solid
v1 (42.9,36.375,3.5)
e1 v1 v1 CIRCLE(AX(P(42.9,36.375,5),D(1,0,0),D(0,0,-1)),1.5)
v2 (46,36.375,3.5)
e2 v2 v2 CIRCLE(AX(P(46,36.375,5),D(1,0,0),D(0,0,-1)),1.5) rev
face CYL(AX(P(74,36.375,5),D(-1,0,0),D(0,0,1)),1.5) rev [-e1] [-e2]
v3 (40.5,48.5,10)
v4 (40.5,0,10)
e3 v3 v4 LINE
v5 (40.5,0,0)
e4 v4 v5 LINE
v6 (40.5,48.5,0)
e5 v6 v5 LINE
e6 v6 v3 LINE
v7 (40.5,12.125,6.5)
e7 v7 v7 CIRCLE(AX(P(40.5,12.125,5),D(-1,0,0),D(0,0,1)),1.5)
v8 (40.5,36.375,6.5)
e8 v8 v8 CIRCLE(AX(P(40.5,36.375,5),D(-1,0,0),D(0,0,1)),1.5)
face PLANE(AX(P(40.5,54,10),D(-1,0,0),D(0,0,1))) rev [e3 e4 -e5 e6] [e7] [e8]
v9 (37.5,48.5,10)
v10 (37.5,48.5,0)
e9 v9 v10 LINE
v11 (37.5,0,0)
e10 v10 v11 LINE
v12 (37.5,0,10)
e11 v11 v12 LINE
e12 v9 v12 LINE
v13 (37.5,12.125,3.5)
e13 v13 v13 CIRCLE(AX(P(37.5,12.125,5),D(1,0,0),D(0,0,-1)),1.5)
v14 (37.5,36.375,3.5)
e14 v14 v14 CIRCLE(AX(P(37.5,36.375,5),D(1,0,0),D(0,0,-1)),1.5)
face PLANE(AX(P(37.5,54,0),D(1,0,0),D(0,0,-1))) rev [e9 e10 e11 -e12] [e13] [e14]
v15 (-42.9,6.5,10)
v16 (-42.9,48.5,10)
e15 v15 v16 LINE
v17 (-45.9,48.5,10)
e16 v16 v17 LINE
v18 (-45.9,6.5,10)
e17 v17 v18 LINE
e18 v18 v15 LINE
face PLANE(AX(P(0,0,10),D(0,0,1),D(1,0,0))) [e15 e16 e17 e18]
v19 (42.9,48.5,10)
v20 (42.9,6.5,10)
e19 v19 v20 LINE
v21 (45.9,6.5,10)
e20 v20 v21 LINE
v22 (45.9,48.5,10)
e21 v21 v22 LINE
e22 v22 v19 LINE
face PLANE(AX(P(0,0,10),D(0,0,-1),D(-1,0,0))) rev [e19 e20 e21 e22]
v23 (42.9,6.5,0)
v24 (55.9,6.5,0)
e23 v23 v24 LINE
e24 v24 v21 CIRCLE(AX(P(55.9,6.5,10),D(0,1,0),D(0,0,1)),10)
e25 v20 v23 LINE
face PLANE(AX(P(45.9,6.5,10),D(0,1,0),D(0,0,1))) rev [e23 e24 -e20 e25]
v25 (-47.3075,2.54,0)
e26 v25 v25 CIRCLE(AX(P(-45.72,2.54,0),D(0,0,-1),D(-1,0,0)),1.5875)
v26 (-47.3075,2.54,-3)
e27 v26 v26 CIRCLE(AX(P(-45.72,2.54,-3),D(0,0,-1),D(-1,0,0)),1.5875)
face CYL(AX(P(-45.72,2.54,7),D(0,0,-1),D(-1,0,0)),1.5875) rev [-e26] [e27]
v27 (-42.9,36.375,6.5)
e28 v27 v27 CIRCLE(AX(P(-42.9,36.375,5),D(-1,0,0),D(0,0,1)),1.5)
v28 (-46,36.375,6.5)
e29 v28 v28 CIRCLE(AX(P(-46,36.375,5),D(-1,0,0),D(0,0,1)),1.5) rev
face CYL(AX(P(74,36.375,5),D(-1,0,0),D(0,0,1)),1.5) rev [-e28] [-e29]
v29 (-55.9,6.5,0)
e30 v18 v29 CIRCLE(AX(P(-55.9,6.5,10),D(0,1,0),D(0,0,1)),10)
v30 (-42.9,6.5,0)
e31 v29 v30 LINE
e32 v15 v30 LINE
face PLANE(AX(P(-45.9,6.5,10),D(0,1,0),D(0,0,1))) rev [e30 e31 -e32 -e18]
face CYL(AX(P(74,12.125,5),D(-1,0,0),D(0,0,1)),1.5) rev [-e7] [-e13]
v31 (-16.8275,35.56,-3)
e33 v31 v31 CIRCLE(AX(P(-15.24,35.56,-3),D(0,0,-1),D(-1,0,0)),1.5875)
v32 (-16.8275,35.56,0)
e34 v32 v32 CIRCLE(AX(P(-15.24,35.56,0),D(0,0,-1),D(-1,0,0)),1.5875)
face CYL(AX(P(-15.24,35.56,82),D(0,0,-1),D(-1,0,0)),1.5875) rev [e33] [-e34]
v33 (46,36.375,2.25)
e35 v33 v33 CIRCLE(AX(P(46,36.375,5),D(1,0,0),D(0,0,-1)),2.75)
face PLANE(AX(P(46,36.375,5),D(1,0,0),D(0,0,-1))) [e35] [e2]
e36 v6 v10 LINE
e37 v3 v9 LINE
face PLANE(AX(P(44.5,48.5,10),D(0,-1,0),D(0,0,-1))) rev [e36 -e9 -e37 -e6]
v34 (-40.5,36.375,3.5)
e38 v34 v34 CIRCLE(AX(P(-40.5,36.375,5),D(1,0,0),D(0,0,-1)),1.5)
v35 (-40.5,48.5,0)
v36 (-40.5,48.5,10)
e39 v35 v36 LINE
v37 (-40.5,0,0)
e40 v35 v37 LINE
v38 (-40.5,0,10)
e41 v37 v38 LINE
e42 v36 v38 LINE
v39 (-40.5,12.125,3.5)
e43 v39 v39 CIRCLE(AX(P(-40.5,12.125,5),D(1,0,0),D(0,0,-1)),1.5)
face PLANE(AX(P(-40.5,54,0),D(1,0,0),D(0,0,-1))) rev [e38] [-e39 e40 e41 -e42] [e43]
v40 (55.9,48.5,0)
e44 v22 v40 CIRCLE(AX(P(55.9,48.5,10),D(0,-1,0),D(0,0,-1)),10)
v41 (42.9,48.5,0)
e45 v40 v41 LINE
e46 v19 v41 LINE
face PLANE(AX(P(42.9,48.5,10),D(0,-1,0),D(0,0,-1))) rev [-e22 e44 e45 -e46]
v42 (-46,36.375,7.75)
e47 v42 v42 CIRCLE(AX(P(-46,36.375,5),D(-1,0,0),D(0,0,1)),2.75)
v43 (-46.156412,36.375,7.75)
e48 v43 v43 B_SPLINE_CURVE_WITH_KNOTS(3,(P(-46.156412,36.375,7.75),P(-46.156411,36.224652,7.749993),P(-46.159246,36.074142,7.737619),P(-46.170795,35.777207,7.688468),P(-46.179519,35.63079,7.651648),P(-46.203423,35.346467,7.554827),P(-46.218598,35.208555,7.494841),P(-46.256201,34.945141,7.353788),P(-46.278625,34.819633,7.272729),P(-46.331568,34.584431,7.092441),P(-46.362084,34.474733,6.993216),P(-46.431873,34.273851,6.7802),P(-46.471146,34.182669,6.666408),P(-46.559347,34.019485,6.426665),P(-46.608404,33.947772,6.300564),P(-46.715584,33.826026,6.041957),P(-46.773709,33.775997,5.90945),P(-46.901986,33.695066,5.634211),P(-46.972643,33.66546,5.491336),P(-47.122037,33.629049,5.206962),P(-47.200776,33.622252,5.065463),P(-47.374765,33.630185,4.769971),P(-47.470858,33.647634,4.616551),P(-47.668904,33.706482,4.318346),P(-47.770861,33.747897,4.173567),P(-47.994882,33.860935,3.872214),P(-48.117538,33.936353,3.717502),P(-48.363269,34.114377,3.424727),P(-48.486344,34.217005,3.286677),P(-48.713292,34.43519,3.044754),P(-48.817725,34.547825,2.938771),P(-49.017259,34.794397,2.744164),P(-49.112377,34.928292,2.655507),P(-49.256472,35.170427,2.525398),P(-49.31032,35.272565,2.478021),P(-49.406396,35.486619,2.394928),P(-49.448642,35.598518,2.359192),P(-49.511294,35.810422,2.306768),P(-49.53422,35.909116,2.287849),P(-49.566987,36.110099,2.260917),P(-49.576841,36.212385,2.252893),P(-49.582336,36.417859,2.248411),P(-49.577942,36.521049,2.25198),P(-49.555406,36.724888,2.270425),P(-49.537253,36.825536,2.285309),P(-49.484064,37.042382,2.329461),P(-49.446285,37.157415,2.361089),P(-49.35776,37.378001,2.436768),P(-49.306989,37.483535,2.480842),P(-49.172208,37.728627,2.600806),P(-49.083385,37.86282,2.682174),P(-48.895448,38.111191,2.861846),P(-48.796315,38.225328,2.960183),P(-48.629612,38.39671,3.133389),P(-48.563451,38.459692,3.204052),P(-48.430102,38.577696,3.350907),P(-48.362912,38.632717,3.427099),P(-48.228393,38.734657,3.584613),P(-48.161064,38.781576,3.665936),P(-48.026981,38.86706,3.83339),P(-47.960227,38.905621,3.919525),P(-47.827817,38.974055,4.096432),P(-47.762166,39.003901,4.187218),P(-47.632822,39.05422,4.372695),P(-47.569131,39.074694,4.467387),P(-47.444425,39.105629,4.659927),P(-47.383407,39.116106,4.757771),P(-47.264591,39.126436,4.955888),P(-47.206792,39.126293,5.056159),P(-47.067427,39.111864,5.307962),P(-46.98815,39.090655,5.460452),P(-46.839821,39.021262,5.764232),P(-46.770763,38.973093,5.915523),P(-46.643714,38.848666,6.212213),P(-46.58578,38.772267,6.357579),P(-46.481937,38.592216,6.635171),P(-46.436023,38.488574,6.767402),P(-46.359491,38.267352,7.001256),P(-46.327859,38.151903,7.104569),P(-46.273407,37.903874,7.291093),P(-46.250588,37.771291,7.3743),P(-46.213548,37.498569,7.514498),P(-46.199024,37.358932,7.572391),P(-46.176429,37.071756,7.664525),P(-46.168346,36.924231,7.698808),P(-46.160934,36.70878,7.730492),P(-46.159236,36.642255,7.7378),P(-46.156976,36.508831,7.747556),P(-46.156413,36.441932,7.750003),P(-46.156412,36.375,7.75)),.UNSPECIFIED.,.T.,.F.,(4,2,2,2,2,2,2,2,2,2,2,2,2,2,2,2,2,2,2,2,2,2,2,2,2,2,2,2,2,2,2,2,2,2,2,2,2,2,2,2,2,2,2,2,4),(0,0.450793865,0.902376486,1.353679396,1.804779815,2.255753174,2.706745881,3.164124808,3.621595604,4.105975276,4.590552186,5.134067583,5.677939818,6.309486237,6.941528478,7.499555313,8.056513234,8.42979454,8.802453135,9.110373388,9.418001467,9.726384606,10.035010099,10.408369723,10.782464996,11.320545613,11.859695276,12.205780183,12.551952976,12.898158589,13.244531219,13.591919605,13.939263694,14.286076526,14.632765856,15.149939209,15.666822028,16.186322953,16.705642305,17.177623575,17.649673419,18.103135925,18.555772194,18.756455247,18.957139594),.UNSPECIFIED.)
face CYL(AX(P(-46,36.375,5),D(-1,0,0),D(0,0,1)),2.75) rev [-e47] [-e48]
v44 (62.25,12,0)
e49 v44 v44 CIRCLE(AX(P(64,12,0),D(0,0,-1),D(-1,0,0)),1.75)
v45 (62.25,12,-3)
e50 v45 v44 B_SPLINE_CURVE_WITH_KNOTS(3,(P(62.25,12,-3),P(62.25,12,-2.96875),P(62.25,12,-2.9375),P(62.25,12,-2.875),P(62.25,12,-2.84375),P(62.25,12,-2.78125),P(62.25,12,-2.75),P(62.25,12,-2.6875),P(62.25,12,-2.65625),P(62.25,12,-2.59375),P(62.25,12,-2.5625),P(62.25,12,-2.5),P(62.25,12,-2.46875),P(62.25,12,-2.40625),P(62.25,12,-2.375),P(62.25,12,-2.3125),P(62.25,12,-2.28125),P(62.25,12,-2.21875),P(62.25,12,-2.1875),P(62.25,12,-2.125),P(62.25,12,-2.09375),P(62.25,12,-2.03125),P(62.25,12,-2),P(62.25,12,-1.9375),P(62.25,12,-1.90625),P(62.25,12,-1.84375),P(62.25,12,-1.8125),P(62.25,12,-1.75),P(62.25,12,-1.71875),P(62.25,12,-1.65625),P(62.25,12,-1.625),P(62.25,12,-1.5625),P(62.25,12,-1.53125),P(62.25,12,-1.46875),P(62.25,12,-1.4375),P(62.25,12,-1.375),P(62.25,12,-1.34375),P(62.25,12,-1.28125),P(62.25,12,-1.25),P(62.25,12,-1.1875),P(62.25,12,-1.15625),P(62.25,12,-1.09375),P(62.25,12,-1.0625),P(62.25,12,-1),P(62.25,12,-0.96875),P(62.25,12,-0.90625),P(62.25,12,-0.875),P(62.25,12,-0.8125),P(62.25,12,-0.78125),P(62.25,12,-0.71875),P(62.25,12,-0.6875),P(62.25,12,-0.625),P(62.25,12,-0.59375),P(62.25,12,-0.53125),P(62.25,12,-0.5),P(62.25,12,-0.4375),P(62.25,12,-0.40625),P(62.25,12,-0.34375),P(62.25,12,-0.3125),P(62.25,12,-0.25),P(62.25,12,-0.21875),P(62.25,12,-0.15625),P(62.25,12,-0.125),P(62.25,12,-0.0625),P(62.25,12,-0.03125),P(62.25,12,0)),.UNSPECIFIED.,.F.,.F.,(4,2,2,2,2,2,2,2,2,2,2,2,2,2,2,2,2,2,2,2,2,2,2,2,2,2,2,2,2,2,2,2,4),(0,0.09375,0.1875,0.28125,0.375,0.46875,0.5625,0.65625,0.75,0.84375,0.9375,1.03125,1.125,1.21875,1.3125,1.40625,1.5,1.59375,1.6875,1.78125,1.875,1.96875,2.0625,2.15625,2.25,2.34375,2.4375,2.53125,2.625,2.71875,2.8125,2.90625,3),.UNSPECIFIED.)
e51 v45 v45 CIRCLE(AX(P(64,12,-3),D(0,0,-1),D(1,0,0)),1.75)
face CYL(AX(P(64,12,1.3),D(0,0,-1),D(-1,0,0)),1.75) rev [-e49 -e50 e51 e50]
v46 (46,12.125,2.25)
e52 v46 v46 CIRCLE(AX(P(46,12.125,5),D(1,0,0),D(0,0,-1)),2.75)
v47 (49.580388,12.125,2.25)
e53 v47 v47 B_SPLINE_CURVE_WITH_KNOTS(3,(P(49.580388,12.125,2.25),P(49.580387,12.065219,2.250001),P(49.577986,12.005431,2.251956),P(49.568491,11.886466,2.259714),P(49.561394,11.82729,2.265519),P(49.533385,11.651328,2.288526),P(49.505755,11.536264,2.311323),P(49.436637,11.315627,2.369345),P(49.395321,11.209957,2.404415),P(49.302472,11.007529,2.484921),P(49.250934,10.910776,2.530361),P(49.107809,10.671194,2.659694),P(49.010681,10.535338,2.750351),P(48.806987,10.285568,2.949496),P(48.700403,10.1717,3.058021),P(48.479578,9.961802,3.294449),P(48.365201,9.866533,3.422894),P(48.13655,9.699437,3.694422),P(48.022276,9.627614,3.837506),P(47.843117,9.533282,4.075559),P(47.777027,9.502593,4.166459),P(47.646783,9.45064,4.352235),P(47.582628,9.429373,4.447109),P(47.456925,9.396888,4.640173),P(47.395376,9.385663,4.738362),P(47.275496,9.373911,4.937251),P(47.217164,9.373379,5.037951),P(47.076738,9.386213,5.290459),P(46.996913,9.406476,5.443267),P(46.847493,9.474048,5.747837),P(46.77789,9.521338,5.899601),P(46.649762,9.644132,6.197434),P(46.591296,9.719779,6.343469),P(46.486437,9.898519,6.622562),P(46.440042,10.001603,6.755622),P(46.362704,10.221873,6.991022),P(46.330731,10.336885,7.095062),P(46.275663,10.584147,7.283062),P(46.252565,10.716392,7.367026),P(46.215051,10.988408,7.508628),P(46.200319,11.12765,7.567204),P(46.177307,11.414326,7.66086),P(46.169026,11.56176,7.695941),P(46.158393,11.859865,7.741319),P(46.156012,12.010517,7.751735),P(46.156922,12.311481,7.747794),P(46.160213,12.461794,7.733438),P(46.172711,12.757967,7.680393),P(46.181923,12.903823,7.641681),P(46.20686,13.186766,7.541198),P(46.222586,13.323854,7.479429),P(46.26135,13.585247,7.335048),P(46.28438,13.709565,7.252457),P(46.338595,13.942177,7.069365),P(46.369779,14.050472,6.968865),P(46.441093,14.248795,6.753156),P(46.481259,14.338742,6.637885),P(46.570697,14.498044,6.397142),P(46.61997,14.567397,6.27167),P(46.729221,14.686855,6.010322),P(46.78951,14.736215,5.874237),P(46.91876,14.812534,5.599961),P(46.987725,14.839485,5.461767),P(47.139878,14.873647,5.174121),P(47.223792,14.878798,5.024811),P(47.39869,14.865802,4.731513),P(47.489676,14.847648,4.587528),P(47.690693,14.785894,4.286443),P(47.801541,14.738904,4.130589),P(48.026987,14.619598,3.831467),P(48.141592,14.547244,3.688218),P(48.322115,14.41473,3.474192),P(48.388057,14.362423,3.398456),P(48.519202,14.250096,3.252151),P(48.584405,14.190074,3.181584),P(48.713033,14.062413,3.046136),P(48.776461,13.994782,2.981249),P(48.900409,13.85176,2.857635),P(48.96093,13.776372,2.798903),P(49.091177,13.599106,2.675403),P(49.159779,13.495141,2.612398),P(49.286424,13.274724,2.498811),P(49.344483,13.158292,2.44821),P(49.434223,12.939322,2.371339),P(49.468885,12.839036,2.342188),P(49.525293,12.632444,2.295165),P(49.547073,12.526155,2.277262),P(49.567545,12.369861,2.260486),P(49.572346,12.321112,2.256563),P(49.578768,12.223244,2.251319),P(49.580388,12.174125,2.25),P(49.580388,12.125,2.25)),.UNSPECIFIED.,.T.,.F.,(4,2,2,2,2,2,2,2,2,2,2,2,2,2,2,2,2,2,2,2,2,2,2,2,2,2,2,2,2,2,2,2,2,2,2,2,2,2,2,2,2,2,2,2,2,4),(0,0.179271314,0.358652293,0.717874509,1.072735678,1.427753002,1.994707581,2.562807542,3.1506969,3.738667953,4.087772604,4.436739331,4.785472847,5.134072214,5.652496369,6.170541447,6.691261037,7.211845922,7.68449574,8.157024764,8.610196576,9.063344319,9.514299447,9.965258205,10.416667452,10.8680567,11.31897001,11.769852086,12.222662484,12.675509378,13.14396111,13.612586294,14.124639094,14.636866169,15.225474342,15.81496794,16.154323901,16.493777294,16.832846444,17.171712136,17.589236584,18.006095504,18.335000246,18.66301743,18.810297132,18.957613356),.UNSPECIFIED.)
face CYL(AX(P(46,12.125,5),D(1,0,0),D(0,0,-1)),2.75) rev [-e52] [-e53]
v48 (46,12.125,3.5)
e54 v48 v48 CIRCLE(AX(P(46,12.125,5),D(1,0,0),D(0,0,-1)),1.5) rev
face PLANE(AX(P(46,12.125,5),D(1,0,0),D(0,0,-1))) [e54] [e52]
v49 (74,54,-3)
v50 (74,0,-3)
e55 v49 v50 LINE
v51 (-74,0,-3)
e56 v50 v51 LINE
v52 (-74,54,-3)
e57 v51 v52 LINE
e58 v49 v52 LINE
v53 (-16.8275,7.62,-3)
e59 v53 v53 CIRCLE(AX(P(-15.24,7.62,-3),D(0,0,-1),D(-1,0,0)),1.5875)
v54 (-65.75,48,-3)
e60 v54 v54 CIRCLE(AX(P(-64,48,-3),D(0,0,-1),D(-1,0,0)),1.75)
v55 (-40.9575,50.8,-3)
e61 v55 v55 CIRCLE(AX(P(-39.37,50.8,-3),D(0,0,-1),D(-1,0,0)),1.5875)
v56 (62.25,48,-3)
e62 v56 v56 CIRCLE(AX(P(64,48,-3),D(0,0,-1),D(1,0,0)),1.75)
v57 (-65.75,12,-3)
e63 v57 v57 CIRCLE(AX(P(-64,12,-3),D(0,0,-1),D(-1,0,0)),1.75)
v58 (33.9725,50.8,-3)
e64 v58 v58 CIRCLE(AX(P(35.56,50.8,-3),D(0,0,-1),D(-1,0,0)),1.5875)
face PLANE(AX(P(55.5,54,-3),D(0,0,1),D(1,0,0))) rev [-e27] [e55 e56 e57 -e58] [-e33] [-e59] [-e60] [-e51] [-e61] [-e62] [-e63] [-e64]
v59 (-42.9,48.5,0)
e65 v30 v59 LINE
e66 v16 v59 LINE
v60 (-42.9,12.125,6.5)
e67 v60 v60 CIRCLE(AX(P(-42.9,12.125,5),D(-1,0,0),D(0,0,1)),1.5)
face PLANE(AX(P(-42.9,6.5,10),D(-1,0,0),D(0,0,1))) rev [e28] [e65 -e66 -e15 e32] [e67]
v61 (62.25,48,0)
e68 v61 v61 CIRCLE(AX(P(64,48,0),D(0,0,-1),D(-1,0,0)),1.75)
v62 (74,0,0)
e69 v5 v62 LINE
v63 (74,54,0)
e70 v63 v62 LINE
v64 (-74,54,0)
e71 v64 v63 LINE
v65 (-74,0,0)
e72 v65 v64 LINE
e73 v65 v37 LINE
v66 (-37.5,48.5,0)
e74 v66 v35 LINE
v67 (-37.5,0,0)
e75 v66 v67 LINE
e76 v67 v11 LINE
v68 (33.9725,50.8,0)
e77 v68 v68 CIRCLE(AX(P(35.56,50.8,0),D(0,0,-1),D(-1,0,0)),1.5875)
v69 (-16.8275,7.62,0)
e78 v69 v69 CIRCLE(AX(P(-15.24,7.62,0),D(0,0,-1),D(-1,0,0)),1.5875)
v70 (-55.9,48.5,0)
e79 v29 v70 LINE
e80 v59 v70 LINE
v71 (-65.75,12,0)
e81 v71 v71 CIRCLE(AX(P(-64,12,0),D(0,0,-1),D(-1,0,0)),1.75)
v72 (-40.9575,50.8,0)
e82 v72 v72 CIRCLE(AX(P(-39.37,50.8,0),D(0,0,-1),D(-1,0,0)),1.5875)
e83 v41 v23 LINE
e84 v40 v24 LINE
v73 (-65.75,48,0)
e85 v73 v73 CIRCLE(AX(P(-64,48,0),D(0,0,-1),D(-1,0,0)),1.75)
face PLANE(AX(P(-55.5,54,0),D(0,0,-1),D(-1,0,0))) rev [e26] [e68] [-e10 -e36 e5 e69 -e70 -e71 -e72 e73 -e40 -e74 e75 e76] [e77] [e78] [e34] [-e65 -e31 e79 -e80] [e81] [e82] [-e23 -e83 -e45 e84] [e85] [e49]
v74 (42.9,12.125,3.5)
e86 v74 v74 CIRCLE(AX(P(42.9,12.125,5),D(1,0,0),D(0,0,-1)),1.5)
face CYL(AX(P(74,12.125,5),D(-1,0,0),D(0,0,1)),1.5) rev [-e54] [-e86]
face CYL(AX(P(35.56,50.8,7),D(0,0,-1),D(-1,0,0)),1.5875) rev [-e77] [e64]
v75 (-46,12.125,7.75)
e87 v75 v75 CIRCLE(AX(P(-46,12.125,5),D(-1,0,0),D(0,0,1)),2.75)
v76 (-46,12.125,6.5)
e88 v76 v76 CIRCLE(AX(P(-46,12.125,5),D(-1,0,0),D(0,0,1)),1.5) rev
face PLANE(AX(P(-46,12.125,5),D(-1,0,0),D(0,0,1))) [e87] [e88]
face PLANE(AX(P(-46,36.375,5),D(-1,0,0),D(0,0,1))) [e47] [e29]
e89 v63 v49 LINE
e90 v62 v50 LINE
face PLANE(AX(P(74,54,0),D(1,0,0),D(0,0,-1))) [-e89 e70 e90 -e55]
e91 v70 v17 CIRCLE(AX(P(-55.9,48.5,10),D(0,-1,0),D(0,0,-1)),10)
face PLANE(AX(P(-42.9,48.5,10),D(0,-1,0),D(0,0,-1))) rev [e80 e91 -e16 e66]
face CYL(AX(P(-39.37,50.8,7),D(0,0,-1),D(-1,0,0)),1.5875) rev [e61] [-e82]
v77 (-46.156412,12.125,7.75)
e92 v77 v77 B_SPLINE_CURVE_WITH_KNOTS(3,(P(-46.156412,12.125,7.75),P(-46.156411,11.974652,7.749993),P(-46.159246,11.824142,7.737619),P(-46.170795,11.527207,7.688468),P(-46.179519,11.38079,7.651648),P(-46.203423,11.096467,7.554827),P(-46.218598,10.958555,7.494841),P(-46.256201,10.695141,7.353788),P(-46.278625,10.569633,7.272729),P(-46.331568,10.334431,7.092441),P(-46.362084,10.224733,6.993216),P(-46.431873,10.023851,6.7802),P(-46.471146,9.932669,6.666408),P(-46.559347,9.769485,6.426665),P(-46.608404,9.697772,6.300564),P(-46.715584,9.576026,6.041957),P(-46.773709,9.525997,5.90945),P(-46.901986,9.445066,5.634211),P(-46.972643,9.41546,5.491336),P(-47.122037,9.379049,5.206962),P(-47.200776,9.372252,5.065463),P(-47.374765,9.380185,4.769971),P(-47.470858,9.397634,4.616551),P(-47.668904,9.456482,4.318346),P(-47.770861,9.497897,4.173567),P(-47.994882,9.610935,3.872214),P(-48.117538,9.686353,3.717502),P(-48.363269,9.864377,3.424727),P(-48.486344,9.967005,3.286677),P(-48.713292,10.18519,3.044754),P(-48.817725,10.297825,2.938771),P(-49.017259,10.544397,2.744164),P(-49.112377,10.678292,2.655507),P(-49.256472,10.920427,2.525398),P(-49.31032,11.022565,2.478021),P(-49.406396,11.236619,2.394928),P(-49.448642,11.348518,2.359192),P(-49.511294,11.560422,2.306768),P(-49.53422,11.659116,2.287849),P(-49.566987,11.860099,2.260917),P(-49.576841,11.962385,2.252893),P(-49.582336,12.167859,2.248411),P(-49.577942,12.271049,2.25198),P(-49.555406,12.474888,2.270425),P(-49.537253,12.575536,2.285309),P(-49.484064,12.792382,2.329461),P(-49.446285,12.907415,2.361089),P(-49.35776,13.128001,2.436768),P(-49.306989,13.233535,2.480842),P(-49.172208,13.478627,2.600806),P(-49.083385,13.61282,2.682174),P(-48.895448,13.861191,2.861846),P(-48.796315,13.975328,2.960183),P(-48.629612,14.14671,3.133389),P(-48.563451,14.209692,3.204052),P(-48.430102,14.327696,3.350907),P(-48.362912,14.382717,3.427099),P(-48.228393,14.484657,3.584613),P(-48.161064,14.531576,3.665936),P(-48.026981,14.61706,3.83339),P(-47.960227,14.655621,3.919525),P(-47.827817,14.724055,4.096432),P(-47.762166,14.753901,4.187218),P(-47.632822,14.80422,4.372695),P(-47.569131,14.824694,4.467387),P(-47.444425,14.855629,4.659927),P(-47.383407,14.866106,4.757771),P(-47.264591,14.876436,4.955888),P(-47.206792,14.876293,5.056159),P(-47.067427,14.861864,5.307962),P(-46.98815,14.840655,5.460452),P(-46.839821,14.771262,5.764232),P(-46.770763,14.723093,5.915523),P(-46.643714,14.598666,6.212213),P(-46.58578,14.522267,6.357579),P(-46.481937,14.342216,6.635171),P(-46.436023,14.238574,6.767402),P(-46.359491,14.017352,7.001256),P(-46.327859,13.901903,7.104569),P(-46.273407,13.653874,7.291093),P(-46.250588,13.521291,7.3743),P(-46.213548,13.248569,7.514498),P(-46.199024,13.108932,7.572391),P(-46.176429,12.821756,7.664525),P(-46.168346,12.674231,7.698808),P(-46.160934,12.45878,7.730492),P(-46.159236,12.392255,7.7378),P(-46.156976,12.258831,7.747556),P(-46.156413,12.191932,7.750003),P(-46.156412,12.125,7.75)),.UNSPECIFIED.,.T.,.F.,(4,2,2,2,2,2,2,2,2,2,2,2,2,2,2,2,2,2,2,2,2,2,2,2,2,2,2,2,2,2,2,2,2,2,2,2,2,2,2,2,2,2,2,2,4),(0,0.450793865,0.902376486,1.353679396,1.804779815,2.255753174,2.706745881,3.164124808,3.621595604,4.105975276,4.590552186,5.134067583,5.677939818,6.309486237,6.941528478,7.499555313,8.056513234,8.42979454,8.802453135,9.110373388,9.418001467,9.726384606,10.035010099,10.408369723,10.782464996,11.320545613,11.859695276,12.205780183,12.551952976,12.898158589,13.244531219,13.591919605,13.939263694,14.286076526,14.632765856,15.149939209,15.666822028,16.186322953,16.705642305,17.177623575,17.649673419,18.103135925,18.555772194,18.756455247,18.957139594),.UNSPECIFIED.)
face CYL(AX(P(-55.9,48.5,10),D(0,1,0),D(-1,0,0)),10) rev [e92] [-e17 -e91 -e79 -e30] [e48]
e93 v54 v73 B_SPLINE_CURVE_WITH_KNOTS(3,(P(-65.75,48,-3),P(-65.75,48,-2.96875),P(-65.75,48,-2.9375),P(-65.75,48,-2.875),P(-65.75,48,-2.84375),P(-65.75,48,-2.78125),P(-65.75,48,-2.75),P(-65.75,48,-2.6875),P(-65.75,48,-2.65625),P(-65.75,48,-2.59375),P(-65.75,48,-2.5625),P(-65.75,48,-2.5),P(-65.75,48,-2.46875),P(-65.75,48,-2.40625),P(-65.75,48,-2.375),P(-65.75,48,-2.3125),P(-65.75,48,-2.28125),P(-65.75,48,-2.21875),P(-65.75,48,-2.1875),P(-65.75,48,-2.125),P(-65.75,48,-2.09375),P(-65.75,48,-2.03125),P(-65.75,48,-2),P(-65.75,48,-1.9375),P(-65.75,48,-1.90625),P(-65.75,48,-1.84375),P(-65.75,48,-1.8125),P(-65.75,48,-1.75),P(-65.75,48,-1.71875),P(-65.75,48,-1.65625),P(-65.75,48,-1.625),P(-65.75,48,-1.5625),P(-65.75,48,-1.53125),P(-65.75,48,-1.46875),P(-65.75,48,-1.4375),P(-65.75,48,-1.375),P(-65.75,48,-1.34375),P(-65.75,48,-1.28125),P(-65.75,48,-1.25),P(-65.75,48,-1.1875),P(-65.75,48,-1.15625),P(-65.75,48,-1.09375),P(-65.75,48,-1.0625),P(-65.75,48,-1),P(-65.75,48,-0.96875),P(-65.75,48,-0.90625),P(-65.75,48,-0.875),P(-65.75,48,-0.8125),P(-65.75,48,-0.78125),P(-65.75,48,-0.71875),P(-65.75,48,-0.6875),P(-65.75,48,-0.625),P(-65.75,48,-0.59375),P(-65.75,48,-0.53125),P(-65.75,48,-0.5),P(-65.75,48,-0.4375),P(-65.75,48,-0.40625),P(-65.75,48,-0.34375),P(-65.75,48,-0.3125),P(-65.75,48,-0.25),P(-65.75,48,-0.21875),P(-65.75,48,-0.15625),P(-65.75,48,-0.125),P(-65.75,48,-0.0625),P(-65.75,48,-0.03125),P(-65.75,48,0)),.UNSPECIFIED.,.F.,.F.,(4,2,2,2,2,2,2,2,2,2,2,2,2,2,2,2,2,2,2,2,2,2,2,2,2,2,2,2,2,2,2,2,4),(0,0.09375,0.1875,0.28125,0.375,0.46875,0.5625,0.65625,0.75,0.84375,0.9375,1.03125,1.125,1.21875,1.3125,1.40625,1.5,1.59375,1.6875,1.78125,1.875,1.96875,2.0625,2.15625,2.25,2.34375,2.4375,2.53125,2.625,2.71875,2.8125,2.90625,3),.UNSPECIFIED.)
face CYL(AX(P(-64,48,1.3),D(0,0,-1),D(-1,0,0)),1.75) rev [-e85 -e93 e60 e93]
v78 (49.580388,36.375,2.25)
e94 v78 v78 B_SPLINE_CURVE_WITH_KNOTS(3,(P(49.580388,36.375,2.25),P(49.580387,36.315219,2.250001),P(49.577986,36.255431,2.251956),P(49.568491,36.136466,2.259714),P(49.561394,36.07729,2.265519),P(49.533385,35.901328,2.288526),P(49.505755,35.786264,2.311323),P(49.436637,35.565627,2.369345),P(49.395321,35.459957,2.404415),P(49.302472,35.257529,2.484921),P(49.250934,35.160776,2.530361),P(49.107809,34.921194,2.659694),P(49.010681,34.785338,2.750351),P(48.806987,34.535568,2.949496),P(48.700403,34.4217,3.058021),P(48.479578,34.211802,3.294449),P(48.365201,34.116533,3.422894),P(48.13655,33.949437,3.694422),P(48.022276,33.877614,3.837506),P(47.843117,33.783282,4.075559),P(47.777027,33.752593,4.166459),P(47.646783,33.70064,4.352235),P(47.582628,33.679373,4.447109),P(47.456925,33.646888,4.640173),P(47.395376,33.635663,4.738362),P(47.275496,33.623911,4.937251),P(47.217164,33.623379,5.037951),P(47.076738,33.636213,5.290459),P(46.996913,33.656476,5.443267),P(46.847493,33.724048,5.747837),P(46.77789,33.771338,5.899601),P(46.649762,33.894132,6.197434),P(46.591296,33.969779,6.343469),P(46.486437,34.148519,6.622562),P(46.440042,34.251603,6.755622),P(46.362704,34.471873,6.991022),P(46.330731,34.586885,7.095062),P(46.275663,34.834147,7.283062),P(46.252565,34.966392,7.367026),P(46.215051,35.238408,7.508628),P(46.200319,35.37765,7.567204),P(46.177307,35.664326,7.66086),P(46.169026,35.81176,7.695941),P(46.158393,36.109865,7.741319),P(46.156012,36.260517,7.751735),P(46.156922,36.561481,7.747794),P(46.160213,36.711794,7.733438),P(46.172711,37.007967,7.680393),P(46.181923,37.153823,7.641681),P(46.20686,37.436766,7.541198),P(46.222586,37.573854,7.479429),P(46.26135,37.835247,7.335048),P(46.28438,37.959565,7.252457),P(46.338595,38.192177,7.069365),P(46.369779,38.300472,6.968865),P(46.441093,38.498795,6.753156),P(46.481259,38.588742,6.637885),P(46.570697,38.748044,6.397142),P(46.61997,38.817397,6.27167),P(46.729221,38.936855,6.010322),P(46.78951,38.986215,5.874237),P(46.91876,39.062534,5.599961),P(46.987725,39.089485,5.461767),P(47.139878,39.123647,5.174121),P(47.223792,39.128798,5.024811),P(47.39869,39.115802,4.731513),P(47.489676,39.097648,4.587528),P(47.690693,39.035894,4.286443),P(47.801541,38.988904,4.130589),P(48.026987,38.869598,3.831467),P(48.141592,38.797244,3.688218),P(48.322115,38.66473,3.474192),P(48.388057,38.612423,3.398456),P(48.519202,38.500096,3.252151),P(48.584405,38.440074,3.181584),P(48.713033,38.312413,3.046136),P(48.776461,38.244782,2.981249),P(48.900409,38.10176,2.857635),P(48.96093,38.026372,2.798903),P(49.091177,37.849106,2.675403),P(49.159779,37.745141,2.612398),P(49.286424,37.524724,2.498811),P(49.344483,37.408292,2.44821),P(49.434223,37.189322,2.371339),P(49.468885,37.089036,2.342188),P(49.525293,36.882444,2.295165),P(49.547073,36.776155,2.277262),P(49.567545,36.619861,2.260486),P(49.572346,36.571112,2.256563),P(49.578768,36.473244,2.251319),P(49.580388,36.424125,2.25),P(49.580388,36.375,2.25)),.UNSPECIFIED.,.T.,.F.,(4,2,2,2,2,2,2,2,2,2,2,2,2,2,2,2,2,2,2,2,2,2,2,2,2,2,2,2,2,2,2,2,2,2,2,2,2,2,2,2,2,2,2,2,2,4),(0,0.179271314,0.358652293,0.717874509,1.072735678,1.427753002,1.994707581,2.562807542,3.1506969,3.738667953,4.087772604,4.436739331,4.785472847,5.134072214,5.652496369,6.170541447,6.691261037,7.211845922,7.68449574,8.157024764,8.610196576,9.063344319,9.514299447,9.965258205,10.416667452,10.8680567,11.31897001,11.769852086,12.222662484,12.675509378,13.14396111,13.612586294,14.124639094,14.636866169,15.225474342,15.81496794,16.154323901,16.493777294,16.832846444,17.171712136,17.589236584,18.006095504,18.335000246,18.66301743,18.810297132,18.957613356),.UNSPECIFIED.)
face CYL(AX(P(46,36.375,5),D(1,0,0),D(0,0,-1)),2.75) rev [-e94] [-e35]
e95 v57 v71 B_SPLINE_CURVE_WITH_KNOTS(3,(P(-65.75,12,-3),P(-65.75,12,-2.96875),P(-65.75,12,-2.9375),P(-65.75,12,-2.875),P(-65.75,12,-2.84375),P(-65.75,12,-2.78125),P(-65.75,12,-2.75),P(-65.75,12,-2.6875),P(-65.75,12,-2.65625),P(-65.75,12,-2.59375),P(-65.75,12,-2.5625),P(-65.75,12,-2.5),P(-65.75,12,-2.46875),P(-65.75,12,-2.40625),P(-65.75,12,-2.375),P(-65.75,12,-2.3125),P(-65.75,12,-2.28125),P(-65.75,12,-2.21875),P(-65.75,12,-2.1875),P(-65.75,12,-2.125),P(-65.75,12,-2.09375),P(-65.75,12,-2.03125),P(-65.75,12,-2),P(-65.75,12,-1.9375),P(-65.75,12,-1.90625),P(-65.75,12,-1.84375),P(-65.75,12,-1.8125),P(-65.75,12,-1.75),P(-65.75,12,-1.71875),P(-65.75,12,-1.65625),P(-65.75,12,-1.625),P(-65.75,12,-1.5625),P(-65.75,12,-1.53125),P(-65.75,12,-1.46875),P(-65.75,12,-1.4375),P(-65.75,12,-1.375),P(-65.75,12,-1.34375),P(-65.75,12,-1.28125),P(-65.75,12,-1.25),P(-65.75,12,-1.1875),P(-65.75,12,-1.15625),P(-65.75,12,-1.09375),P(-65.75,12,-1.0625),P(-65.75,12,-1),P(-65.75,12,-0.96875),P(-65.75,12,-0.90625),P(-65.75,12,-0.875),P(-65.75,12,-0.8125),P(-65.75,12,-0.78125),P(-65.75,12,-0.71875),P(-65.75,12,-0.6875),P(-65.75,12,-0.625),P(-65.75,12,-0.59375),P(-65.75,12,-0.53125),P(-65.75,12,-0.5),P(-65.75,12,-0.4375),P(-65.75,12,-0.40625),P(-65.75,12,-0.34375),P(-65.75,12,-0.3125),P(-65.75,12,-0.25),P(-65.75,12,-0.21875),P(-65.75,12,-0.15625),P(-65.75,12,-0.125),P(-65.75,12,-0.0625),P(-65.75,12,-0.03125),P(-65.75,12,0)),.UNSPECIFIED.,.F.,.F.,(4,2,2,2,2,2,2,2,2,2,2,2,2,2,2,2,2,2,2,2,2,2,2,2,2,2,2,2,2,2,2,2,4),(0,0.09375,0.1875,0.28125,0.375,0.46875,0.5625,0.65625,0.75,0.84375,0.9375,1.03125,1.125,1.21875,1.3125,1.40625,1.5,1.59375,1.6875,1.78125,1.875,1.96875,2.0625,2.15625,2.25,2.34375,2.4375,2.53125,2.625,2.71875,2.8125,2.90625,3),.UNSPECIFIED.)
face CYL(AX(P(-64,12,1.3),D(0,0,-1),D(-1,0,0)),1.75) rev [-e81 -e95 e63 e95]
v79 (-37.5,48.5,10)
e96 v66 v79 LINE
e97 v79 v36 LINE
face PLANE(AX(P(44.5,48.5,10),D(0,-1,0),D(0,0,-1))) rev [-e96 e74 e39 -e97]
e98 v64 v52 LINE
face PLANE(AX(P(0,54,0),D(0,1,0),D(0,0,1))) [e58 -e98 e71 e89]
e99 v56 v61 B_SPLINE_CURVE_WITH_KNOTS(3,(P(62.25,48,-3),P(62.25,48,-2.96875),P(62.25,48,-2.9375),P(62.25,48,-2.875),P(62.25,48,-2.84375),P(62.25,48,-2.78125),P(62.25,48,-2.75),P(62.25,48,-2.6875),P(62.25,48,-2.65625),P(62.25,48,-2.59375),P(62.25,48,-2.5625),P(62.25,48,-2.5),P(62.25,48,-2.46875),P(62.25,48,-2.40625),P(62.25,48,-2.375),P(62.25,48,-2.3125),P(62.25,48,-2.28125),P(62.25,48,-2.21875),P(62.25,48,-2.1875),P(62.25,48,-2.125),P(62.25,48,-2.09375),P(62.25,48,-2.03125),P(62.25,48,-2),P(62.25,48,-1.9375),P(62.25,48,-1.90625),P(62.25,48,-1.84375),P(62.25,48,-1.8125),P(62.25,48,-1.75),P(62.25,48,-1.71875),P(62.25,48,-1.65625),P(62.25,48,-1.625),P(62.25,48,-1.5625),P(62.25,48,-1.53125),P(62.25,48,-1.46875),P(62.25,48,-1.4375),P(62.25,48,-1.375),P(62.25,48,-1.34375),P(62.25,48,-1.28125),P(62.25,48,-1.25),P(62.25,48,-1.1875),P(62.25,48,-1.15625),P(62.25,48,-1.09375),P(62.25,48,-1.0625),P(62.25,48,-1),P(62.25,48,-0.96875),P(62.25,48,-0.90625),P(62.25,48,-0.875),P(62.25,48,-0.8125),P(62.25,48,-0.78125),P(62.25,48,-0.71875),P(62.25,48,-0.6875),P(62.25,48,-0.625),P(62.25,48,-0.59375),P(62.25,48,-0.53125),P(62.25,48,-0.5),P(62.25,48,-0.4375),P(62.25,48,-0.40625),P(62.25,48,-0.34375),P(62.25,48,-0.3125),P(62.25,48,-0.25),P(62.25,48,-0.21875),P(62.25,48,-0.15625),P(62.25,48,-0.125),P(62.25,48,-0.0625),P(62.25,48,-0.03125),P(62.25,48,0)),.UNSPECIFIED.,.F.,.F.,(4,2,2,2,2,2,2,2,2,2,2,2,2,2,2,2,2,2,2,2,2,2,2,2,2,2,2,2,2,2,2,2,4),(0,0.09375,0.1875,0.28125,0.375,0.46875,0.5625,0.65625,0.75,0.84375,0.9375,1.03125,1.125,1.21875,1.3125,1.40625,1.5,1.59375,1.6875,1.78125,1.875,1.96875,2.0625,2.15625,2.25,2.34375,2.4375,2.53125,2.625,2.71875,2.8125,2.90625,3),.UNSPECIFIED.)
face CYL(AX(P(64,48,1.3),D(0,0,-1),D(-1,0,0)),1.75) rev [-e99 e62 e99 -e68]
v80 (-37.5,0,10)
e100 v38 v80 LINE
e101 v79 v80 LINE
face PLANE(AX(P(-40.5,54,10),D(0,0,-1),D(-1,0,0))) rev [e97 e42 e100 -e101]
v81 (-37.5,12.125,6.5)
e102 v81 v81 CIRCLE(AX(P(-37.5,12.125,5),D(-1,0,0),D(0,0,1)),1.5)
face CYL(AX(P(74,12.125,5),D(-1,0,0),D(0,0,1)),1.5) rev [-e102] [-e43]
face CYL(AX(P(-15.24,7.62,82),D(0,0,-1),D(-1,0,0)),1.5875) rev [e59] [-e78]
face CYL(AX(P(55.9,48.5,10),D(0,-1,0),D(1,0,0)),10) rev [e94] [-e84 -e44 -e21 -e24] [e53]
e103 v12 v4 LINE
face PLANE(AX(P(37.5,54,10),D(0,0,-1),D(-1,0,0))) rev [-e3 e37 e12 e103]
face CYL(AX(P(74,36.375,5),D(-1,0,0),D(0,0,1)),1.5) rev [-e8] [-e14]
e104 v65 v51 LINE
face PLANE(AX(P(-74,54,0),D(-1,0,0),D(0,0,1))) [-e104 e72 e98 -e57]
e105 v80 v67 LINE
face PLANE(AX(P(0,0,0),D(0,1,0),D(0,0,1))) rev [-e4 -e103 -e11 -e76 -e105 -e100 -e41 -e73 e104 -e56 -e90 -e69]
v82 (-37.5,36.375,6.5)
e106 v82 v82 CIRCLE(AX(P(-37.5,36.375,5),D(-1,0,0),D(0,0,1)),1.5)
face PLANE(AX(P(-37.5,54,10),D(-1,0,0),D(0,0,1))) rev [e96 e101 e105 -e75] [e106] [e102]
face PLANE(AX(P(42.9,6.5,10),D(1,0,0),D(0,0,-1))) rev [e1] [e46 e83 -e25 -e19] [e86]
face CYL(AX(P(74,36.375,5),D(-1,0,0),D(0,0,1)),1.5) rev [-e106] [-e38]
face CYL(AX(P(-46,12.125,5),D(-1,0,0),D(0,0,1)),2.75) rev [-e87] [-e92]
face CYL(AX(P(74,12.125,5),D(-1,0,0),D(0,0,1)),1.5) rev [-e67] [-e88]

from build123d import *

# Parameters (mm, degrees)
BOSS_EXTRUDE1_DEPTH     = 54
SKETCH2_W               = 10
SKETCH2_H               = 5.5
CUT_EXTRUDE1_DEPTH      = 85
SKETCH5_R               = 1.5875
CUT_EXTRUDE4_DEPTH      = 85
SKETCH3_R               = 1.5875
CUT_EXTRUDE5_DEPTH      = 10
SKETCH6_W               = 18.5
SKETCH6_H               = 54
BOSS_EXTRUDE2_DEPTH     = 3
SKETCH7_W               = 3
SKETCH7_H               = 42
BOSS_EXTRUDE3_DEPTH     = 10
CUT_EXTRUDE3_DEPTH      = 127.989172767
CUT_EXTRUDE3_DEPTH_BACK = 127.989172767
SKETCH4_R               = 1.5
FILLET1_R               = 10
SKETCH8_R               = 2.75
CUT_EXTRUDE6_DEPTH      = 28
CUT_EXTRUDE7_START      = -28
SKETCH10_R              = 2.75
CUT_EXTRUDE7_DEPTH      = 28
SKETCH11_R              = 1.75
CUT_EXTRUDE8_DEPTH      = 4.3


with BuildPart() as part:
    # Sketch1 → Boss-Extrude1 (new body)
    with BuildSketch(Plane(origin=(0, 0, 0), x_dir=(1, 0, 0), z_dir=(0, 1, 0))):
        Polygon((-37.5, -10), (-37.5, 0), (37.5, 0), (37.5, -10), (40.5, -10), (40.5, 0), (55.5, 0), (55.5, 3), (-55.5, 3), (-55.5, 0), (-40.5, 0), (-40.5, -10), align=None)
    extrude(amount=BOSS_EXTRUDE1_DEPTH)

    # Sketch2 → Cut-Extrude1 (cut)
    with BuildSketch(Plane.ZY.offset(40.5)):
        with Locations((5, 51.25)):
            Rectangle(SKETCH2_W, SKETCH2_H)
    extrude(amount=-CUT_EXTRUDE1_DEPTH, mode=Mode.SUBTRACT)

    # Sketch5 → Cut-Extrude4 (cut)
    with BuildSketch(Plane(origin=(0, 0, -3), x_dir=(-1, 0, 0), z_dir=(0, 0, -1))):
        with Locations((15.24, 35.56)):
            Circle(SKETCH5_R)
        with Locations((15.24, 7.62)):
            Circle(SKETCH5_R)
    extrude(amount=-CUT_EXTRUDE4_DEPTH, mode=Mode.SUBTRACT)

    # Sketch3 → Cut-Extrude5 (cut)
    with BuildSketch(Plane(origin=(0, 0, -3), x_dir=(-1, 0, 0), z_dir=(0, 0, -1))):
        with Locations((45.72, 2.54)):
            Circle(SKETCH3_R)
        with Locations((-35.56, 50.8)):
            Circle(SKETCH3_R)
        with Locations((39.37, 50.8)):
            Circle(SKETCH3_R)
    extrude(amount=-CUT_EXTRUDE5_DEPTH, mode=Mode.SUBTRACT)

    # Sketch6 → Boss-Extrude2 (add)
    with BuildSketch(Plane(origin=(0, 0, -3), x_dir=(-1, 0, 0), z_dir=(0, 0, -1))):
        with Locations((-64.75, 27)):
            Rectangle(SKETCH6_W, SKETCH6_H)
        with Locations((64.75, 27)):
            Rectangle(SKETCH6_W, SKETCH6_H)
    extrude(amount=-BOSS_EXTRUDE2_DEPTH)

    # Sketch7 → Boss-Extrude3 (add)
    with BuildSketch(Plane.XY):
        with Locations((-44.4, 27.5)):
            Rectangle(SKETCH7_W, SKETCH7_H)
        with Locations((44.4, 27.5)):
            Rectangle(SKETCH7_W, SKETCH7_H)
    extrude(amount=BOSS_EXTRUDE3_DEPTH)

    # Sketch4 → Cut-Extrude3 (cut, two sides: drawn at the far end of the back side and taken through both)
    with BuildSketch(Plane.ZY.offset(40.5).offset(-CUT_EXTRUDE3_DEPTH_BACK)):
        with Locations((5, 12.125)):
            Circle(SKETCH4_R)
        with Locations((5, 36.375)):
            Circle(SKETCH4_R)
    extrude(amount=CUT_EXTRUDE3_DEPTH + CUT_EXTRUDE3_DEPTH_BACK, mode=Mode.SUBTRACT)

    # Fillet1
    # the kernel refuses this fillet: 10 mm, written as the material it adds along each edge
    with BuildSketch(Plane(origin=(45.9, 48.5, 0), x_dir=(1, 0, 0), z_dir=(0, -1, 0))) as fillet1_piece_1_section:
        with BuildLine():
            CenterArc((FILLET1_R, FILLET1_R), FILLET1_R, 180, 90)
            Line((0, FILLET1_R), (0, 0))
            Line((0, 0), (FILLET1_R, 0))
        make_face()
    fillet1_piece_1 = extrude(amount=42, mode=Mode.PRIVATE)
    fillet1_piece_1 = fillet1_piece_1 - Plane(origin=(48.198345869, 36.375, 5), x_dir=(0, 0, 1), z_dir=(-1, 0, 0)) * Cylinder(1.5, 124, mode=Mode.PRIVATE)
    fillet1_piece_1 = fillet1_piece_1 - Plane(origin=(48.198345869, 12.125, 5), x_dir=(0, 0, 1), z_dir=(-1, 0, 0)) * Cylinder(1.5, 124, mode=Mode.PRIVATE)
    add(fillet1_piece_1)
    with BuildSketch(Plane(origin=(-45.9, 48.5, 0), x_dir=(-1, 0, 0), z_dir=(0, -1, 0))) as fillet1_piece_2_section:
        with BuildLine():
            CenterArc((FILLET1_R, -FILLET1_R), FILLET1_R, 90, 90)
            Line((0, -FILLET1_R), (0, 0))
            Line((0, 0), (FILLET1_R, 0))
        make_face()
    fillet1_piece_2 = extrude(amount=42, mode=Mode.PRIVATE)
    fillet1_piece_2 = fillet1_piece_2 - Plane(origin=(-48.198347973, 36.375, 5), x_dir=(0, 0, 1), z_dir=(1, 0, 0)) * Cylinder(1.5, 124, mode=Mode.PRIVATE)
    fillet1_piece_2 = fillet1_piece_2 - Plane(origin=(-48.198347973, 12.125, 5), x_dir=(0, 0, 1), z_dir=(1, 0, 0)) * Cylinder(1.5, 124, mode=Mode.PRIVATE)
    add(fillet1_piece_2)

    # Sketch8 → Cut-Extrude6 (cut)
    with BuildSketch(Plane(origin=(74, 0, 0), x_dir=(0, 0, -1), z_dir=(1, 0, 0))):
        with Locations((-5, 36.375)):
            Circle(SKETCH8_R)
        with Locations((-5, 12.125)):
            Circle(SKETCH8_R)
    extrude(amount=-CUT_EXTRUDE6_DEPTH, mode=Mode.SUBTRACT)

    # Sketch10 → Cut-Extrude7 (cut)
    with BuildSketch(Plane.ZY.offset(74).offset(CUT_EXTRUDE7_START)):
        with Locations(Location((5, 12.125, 0), (0, 0, 180))):
            Circle(SKETCH10_R)
        with Locations(Location((5, 36.375, 0), (0, 0, 180))):
            Circle(SKETCH10_R)
    extrude(amount=CUT_EXTRUDE7_DEPTH, mode=Mode.SUBTRACT)

    # Sketch11 → Cut-Extrude8 (cut)
    with BuildSketch(Plane(origin=(0, 0, -3), x_dir=(-1, 0, 0), z_dir=(0, 0, -1))):
        with Locations((64, 12)):
            Circle(SKETCH11_R)
        with Locations((64, 48)):
            Circle(SKETCH11_R)
        with Locations((-64, 48)):
            Circle(SKETCH11_R)
        with Locations((-64, 12)):
            Circle(SKETCH11_R)
    extrude(amount=-CUT_EXTRUDE8_DEPTH, mode=Mode.SUBTRACT)


solid = part.part
